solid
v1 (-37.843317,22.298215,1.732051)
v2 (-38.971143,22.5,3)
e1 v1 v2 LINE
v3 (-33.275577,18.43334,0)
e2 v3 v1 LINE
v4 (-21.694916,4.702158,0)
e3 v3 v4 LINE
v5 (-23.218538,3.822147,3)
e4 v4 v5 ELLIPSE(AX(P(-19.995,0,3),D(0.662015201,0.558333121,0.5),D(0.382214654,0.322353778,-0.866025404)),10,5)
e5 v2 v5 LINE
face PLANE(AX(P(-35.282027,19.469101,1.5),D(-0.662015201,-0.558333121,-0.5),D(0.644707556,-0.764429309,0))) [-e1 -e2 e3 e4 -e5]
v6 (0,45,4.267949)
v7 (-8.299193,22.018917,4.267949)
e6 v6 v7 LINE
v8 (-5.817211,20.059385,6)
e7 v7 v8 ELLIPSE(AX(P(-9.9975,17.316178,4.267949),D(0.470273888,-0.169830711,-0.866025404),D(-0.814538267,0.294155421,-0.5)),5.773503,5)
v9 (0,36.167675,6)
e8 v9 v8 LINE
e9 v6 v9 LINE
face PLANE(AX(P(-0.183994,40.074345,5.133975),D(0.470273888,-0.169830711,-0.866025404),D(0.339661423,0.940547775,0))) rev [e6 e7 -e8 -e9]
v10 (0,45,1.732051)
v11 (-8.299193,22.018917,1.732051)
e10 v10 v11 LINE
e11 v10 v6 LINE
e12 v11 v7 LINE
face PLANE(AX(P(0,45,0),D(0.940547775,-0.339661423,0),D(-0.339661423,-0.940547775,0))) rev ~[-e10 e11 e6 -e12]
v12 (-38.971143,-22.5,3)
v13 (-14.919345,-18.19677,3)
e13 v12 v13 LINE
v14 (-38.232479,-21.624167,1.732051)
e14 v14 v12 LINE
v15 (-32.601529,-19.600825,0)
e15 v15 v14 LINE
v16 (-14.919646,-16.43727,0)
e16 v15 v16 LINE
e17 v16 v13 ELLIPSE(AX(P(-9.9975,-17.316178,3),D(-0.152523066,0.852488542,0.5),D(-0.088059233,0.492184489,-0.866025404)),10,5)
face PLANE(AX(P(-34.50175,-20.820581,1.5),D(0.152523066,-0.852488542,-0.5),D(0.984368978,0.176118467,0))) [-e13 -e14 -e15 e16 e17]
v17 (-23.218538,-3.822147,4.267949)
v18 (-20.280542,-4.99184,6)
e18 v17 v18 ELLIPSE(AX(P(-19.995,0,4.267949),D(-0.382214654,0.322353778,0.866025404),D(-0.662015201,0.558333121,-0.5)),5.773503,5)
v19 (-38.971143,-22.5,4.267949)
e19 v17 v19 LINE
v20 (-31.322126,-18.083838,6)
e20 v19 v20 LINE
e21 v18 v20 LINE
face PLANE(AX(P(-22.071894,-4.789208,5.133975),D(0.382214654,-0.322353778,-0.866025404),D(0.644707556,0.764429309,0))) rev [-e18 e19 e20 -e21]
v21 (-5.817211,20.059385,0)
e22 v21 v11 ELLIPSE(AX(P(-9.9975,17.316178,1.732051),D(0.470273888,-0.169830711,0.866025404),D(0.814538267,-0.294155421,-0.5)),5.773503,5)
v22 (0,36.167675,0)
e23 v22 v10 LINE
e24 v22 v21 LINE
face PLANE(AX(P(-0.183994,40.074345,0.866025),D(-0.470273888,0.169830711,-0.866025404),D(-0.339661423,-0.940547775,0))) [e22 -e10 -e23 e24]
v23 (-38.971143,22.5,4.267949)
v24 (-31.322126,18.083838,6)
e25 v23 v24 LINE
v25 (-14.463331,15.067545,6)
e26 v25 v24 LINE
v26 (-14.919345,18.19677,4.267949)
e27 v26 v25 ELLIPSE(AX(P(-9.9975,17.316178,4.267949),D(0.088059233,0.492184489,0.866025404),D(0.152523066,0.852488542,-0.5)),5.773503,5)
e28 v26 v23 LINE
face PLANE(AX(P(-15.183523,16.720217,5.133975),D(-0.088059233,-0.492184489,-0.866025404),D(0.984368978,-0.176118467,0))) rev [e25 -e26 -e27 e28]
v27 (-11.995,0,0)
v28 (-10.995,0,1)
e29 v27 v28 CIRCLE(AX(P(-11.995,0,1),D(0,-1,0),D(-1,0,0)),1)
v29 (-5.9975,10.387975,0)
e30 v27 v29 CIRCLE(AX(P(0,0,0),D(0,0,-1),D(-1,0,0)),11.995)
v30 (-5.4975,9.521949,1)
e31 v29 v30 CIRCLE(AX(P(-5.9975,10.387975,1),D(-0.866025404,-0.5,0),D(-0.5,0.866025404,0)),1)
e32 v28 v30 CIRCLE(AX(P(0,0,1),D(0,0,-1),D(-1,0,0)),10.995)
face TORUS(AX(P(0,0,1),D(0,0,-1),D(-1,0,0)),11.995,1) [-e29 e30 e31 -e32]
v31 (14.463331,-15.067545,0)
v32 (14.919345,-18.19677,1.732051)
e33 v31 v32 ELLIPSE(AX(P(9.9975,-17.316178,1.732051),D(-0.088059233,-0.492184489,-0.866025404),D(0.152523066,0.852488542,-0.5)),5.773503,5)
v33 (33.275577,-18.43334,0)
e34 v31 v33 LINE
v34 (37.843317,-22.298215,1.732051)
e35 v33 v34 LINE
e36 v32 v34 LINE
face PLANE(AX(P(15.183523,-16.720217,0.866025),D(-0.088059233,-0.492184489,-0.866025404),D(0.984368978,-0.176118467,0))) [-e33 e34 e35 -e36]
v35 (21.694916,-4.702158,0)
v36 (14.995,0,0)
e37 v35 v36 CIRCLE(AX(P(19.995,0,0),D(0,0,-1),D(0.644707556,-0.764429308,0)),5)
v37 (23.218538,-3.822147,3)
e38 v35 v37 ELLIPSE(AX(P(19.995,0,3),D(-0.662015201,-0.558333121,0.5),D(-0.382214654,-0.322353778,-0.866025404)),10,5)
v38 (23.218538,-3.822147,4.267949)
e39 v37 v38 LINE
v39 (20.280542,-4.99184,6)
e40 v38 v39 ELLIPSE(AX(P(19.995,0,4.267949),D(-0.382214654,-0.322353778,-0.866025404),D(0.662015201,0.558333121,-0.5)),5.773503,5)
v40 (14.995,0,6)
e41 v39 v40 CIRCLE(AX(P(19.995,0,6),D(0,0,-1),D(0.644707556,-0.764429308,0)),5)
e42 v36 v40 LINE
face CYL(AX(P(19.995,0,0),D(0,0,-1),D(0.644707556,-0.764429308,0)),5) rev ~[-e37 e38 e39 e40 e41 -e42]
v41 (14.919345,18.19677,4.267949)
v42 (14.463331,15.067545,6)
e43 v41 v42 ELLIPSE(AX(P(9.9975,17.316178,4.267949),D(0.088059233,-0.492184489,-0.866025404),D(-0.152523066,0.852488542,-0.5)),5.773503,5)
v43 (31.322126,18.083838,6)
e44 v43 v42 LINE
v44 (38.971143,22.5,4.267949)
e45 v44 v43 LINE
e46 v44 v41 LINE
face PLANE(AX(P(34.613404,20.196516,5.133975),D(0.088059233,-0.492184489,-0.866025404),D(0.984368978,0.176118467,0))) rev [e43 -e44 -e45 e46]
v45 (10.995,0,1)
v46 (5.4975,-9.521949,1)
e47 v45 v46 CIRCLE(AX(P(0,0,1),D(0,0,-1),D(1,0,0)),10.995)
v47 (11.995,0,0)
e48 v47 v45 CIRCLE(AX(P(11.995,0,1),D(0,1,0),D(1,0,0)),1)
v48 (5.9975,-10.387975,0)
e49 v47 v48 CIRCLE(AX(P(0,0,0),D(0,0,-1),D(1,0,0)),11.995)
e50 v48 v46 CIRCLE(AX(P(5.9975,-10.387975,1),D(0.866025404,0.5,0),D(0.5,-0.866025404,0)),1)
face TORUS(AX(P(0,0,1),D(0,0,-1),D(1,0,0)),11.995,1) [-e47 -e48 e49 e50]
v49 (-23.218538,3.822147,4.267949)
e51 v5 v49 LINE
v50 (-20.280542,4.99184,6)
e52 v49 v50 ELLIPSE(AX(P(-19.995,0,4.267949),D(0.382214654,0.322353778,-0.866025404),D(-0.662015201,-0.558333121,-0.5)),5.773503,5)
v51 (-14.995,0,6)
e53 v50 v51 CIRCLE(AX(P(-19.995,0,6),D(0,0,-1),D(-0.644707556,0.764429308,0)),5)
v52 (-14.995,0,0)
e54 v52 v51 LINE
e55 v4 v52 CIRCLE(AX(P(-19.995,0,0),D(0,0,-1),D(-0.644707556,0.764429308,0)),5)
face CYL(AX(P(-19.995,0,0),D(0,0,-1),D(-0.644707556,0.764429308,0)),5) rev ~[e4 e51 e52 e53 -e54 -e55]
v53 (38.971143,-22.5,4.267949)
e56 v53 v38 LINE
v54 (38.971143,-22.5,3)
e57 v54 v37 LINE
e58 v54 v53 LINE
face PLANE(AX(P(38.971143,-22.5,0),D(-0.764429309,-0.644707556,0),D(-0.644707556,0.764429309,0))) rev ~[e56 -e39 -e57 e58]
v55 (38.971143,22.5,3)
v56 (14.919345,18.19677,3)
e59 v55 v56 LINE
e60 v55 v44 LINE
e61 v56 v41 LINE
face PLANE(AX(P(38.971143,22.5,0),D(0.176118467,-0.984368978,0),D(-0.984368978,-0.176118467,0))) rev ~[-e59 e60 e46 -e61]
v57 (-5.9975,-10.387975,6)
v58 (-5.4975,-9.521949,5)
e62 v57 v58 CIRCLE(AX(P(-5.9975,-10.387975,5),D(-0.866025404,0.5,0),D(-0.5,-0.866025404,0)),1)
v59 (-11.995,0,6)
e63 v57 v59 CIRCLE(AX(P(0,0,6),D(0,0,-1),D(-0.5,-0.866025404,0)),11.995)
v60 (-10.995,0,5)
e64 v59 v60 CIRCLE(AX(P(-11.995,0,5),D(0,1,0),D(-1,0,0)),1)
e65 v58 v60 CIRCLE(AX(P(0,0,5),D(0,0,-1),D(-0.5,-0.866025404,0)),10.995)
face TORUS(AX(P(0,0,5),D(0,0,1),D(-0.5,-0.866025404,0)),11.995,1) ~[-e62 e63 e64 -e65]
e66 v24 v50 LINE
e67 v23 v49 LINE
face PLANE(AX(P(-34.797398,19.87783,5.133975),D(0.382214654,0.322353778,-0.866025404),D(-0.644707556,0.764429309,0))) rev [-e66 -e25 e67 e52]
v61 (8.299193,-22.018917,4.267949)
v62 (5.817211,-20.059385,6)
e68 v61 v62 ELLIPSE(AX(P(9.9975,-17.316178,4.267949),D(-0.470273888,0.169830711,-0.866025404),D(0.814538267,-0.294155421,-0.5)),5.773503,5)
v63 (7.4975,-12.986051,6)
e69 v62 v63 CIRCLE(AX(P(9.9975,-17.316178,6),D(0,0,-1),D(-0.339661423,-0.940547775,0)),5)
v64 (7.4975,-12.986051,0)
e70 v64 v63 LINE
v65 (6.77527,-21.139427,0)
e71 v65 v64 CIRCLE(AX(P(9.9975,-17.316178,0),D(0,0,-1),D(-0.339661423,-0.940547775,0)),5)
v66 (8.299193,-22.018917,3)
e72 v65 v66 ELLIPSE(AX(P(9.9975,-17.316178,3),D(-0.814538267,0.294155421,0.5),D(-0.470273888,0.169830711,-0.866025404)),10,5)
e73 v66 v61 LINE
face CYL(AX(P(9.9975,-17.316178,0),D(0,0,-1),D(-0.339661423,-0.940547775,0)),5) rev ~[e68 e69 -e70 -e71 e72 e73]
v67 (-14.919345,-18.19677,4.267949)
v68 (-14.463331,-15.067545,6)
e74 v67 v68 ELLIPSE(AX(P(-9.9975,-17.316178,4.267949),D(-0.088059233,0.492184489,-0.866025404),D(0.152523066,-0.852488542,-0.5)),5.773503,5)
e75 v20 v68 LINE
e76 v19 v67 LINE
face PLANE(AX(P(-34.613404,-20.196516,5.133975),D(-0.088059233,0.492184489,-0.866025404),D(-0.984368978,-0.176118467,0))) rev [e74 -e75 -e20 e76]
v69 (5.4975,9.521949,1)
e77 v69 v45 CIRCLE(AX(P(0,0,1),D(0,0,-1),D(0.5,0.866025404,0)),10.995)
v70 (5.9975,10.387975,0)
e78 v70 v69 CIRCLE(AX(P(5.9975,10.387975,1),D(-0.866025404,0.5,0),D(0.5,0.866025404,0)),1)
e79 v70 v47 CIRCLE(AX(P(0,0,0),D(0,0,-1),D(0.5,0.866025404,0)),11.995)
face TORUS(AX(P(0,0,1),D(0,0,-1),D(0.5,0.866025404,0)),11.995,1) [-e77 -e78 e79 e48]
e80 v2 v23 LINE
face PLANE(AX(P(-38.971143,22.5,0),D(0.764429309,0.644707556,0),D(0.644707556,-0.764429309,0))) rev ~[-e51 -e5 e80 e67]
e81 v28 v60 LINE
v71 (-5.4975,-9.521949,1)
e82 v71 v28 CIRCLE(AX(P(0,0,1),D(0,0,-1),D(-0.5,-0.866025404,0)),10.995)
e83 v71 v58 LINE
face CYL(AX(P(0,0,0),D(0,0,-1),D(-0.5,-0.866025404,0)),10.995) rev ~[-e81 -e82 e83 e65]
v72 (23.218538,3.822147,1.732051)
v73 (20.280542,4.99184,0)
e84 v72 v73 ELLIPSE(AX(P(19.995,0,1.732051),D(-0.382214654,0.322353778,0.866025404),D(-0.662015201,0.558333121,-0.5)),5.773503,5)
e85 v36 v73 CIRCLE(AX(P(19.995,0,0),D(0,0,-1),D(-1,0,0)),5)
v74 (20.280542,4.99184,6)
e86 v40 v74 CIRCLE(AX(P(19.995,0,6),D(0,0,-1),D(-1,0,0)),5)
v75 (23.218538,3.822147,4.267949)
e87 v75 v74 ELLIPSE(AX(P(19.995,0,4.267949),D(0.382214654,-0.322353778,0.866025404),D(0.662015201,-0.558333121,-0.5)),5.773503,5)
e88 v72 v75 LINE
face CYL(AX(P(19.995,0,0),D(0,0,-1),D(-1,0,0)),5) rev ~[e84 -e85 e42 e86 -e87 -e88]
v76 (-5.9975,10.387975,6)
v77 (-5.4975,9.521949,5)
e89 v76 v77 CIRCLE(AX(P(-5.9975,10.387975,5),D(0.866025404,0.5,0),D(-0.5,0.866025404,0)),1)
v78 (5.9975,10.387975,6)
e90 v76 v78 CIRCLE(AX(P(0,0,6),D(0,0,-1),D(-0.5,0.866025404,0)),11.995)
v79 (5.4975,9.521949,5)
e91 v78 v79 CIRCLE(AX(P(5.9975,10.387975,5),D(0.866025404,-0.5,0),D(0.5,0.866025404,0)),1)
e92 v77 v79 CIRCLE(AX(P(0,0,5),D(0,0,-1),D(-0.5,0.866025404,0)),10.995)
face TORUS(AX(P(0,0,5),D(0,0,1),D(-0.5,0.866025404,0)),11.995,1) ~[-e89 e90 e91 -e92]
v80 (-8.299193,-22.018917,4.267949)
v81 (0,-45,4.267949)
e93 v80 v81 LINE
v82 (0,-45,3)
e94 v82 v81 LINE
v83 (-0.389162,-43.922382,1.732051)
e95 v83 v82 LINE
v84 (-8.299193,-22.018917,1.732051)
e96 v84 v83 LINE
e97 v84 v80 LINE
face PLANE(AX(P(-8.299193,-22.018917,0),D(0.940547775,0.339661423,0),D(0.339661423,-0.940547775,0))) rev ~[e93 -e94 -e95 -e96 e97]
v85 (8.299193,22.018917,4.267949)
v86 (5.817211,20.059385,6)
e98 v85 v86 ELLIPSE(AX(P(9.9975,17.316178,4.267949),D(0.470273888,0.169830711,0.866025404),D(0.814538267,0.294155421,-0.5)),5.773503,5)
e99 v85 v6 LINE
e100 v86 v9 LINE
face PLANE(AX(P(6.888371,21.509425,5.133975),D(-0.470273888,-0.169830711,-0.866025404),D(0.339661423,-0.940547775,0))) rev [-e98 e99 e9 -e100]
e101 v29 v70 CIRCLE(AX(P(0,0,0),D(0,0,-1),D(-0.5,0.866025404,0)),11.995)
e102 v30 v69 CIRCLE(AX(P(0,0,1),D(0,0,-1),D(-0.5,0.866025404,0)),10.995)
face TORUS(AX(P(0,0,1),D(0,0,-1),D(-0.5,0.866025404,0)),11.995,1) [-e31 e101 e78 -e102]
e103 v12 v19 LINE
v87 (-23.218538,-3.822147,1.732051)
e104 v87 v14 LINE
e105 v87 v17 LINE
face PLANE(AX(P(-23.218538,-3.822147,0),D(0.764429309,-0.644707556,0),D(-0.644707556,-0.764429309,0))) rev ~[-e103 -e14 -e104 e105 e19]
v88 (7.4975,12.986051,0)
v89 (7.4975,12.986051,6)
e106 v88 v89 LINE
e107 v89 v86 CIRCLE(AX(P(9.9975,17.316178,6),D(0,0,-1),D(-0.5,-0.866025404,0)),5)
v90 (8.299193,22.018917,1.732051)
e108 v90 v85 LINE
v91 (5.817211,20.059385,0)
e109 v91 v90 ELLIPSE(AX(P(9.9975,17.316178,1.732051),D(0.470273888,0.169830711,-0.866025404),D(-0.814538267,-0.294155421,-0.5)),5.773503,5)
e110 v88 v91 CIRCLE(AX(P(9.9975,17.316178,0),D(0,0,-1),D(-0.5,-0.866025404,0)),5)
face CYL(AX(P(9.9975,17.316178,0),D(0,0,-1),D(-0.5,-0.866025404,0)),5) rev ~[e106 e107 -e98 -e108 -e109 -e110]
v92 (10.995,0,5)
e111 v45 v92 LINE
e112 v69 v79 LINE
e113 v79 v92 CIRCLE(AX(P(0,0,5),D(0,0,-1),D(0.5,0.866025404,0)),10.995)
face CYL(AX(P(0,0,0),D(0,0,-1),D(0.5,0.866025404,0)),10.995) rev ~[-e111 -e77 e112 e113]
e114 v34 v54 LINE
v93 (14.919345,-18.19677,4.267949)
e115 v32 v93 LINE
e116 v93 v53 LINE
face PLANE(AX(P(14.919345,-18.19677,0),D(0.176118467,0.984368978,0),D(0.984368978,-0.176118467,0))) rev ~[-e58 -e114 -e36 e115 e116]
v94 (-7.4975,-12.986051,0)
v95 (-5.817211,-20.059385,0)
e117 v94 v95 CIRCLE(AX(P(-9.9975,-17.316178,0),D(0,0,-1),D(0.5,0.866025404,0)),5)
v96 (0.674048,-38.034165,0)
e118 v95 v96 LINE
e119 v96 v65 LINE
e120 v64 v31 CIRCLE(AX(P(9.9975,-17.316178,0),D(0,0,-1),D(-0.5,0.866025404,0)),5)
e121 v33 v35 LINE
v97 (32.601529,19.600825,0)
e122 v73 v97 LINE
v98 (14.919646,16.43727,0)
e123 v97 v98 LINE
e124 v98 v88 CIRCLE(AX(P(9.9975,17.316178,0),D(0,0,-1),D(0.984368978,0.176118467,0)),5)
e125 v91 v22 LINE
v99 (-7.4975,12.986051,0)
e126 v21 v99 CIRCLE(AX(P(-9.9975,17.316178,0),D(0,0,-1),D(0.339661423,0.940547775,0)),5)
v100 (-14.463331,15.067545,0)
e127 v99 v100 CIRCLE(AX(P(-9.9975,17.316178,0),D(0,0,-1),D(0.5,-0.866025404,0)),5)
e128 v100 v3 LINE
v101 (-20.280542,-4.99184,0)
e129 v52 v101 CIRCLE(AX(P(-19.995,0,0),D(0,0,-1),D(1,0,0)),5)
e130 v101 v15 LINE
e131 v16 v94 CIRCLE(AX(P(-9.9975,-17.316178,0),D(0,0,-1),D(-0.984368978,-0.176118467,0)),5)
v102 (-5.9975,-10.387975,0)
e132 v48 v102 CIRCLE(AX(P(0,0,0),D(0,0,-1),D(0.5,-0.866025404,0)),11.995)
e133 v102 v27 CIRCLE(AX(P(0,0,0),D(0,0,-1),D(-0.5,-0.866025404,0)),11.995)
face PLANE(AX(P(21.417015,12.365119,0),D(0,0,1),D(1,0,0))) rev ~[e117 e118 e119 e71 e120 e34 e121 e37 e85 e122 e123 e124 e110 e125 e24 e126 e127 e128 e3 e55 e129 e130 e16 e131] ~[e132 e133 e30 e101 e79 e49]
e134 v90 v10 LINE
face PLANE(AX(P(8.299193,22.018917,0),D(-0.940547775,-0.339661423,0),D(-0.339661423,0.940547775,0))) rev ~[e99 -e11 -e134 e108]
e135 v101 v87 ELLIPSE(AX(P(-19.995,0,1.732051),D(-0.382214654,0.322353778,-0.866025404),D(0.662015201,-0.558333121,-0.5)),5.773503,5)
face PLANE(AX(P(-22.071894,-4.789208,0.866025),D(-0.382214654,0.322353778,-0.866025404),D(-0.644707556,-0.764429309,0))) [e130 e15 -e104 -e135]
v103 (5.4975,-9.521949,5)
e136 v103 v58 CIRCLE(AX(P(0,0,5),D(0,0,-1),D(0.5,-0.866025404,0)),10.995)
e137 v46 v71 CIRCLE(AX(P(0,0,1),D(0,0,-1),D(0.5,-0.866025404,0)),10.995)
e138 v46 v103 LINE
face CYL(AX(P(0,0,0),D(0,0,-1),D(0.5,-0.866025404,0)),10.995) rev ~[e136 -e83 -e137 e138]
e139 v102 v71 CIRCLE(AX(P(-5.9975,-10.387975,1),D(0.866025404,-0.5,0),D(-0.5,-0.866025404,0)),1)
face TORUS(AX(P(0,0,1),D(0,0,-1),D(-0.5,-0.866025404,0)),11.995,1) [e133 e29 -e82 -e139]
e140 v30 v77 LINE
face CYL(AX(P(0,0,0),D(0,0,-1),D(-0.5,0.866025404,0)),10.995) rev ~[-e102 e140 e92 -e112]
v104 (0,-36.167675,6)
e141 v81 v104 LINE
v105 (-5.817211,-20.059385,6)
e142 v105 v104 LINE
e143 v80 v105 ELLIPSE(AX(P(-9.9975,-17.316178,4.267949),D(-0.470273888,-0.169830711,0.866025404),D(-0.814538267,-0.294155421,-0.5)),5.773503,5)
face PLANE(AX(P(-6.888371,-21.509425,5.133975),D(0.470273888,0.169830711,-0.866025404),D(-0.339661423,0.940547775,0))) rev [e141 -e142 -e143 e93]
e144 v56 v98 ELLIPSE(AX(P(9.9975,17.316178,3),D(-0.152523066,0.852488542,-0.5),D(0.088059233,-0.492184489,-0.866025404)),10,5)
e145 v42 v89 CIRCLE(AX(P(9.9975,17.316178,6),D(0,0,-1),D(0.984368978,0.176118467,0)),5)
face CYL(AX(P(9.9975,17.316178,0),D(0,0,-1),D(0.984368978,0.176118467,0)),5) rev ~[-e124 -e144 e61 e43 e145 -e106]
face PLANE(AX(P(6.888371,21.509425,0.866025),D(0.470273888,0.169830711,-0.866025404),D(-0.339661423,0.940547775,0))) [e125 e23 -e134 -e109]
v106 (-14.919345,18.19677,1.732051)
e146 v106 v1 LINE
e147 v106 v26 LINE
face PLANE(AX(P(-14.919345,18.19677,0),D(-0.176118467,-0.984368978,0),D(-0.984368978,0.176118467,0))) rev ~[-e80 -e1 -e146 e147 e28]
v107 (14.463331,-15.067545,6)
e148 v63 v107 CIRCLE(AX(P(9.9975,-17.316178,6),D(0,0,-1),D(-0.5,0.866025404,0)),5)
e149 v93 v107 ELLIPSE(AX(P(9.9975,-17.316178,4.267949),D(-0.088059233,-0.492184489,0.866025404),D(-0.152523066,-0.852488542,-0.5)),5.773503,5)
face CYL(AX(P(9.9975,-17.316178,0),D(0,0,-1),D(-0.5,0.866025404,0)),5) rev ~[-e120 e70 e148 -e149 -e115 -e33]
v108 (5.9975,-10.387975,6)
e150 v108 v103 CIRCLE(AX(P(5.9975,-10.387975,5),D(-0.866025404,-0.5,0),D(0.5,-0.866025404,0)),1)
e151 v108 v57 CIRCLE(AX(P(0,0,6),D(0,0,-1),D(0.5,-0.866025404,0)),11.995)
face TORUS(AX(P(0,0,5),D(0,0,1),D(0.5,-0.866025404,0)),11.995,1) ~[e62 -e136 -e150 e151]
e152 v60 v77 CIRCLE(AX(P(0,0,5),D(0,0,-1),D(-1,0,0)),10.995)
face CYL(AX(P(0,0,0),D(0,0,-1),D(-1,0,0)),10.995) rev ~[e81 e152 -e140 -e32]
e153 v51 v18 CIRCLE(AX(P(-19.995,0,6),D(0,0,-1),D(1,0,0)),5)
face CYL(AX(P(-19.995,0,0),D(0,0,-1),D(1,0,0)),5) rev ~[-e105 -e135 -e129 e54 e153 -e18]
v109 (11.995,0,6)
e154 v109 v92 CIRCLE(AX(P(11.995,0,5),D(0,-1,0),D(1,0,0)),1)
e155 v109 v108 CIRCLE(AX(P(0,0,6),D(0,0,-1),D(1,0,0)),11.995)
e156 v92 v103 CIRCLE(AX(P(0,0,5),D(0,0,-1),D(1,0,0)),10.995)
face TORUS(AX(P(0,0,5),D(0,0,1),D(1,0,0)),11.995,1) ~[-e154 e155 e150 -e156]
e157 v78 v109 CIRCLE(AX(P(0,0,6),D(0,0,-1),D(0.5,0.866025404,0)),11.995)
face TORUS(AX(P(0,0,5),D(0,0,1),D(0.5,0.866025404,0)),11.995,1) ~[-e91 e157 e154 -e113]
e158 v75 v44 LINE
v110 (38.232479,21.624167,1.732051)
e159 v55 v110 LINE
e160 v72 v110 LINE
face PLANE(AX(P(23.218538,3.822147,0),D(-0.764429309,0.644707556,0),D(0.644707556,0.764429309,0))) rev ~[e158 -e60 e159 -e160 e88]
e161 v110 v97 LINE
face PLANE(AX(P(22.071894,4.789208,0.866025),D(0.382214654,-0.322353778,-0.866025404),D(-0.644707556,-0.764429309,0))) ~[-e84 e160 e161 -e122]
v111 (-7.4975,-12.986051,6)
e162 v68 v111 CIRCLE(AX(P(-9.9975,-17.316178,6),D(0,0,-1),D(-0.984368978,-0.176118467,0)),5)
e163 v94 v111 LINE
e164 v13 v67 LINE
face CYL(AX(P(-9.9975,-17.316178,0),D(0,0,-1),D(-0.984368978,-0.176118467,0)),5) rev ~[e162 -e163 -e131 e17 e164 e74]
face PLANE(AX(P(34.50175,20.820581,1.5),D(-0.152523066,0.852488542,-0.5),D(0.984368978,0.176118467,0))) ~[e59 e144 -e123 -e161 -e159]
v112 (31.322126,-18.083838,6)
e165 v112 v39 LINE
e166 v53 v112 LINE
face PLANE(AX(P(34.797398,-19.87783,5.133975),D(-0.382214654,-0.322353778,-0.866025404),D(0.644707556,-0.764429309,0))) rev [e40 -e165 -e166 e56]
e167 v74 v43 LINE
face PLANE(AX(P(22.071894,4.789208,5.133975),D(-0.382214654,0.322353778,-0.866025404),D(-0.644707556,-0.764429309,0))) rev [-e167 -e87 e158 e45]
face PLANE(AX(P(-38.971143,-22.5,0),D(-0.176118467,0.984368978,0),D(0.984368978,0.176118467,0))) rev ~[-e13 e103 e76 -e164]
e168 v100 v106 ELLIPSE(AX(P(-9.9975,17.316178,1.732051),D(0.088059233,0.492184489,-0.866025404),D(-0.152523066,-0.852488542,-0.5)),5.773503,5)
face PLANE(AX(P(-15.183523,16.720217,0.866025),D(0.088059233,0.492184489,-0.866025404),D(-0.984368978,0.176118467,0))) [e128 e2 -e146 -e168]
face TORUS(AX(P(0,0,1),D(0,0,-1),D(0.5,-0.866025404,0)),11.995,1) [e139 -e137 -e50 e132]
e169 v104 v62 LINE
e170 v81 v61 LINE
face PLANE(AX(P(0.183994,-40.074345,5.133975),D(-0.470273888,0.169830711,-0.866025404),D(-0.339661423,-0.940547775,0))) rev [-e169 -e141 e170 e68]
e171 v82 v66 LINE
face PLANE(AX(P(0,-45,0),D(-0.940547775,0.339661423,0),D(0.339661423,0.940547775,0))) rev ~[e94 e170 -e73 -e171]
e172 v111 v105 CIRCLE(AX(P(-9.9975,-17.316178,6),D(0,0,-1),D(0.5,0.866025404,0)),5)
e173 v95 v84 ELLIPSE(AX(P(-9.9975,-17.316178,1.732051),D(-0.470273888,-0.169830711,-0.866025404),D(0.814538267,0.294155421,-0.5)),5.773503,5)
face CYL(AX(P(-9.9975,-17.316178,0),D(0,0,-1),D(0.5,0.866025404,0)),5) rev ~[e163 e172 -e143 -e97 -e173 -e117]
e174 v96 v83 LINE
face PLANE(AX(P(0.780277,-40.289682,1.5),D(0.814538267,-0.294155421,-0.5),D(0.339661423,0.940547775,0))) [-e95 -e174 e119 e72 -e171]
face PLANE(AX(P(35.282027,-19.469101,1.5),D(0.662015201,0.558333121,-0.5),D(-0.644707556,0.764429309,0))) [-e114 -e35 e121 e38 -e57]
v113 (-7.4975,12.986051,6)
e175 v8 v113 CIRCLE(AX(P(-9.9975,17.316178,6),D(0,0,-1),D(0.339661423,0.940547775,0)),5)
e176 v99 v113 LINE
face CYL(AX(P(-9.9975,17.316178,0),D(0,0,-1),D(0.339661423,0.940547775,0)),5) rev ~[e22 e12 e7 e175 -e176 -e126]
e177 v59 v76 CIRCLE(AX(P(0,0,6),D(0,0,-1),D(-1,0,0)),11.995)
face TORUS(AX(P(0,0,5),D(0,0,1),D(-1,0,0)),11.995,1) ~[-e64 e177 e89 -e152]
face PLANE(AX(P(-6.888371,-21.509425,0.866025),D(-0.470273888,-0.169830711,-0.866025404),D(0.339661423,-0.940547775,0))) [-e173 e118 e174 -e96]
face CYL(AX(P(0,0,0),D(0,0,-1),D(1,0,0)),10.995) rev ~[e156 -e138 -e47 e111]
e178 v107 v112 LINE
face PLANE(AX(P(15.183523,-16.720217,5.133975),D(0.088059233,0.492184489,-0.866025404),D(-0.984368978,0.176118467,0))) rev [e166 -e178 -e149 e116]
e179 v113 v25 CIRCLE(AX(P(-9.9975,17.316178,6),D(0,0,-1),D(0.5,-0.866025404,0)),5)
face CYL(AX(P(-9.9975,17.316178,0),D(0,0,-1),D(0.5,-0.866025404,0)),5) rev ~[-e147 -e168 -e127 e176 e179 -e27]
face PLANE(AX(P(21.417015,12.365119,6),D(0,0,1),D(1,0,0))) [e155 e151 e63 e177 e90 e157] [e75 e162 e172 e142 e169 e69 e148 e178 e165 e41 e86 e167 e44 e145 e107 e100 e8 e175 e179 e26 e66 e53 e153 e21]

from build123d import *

# Parameters (mm, degrees)
F1_DEPTH     = 6
F2_C1_SIZE2  = 3
F2_C1_SIZE   = 1.7320508076
F2_C2_SIZE2  = 3
F2_C2_SIZE   = 1.7320508076
F2_C3_SIZE2  = 1.7320508076
F2_C3_SIZE   = 3
F2_C4_SIZE2  = 3
F2_C4_SIZE   = 1.7320508076
F2_C5_SIZE2  = 1.7320508076
F2_C5_SIZE   = 3
F2_C6_SIZE2  = 3
F2_C6_SIZE   = 1.7320508076
F2_C7_SIZE2  = 1.7320508076
F2_C7_SIZE   = 3
F2_C8_SIZE2  = 3
F2_C8_SIZE   = 1.7320508076
F2_C9_SIZE2  = 1.7320508076
F2_C9_SIZE   = 3
F2_C10_SIZE2 = 3
F2_C10_SIZE  = 1.7320508076
F2_C11_SIZE2 = 3
F2_C11_SIZE  = 1.7320508076
F2_C12_SIZE2 = 3
F2_C12_SIZE  = 1.7320508076
F2_C13_SIZE2 = 1.7320508076
F2_C13_SIZE  = 3
F2_C14_SIZE2 = 3
F2_C14_SIZE  = 1.7320508076
F2_C15_SIZE2 = 3
F2_C15_SIZE  = 1.7320508076
F2_C16_SIZE2 = 3
F2_C16_SIZE  = 1.7320508076
F2_C17_SIZE2 = 1.7320508076
F2_C17_SIZE  = 3
F2_C18_SIZE2 = 3
F2_C18_SIZE  = 1.7320508076
F2_C19_SIZE2 = 3
F2_C19_SIZE  = 1.7320508076
F2_C20_SIZE2 = 3
F2_C20_SIZE  = 1.7320508076
F2_C21_SIZE2 = 1.7320508076
F2_C21_SIZE  = 3
F2_C22_SIZE2 = 3
F2_C22_SIZE  = 1.7320508076
F2_C23_SIZE2 = 3
F2_C23_SIZE  = 1.7320508076
F2_C24_SIZE2 = 3
F2_C24_SIZE  = 1.7320508076
F3_R         = 1


with BuildPart() as f1:
    # F0 (on Top) → F1 (new body)
    with BuildSketch(Plane.XY):
        with BuildLine():
            ThreePointArc((5.4975, 9.5219493146), (9.5219493146, 5.4975), (10.995, 0))
            Line((10.995, 0), (14.995, 0))
            ThreePointArc((14.995, 0), (17.8875950663, 4.5341861944), (23.2185377782, 3.8221465425))
            Line((23.2185377782, 3.8221465425), (38.9711431703, 22.5))
            Line((38.9711431703, 22.5), (14.9193448919, 18.1967702834))
            ThreePointArc((14.9193448919, 18.1967702834), (12.870517963, 13.2240186428), (7.4975, 12.9860509297))
            Line((7.4975, 12.9860509297), (5.4975, 9.5219493146))
        make_face()
        with BuildLine():
            ThreePointArc((-5.4975, 9.5219493146), (0, 10.995), (5.4975, 9.5219493146))
            Line((5.4975, 9.5219493146), (7.4975, 12.9860509297))
            ThreePointArc((7.4975, 12.9860509297), (5.0170771033, 17.7582048372), (8.2991928863, 22.0189168259))
            Line((8.2991928863, 22.0189168259), (0, 45))
            Line((0, 45), (-8.2991928863, 22.0189168259))
            ThreePointArc((-8.2991928863, 22.0189168259), (-5.0170771033, 17.7582048372), (-7.4975, 12.9860509297))
            Line((-7.4975, 12.9860509297), (-5.4975, 9.5219493146))
        make_face()
        with BuildLine():
            ThreePointArc((-10.995, 0), (-9.5219493146, 5.4975), (-5.4975, 9.5219493146))
            Line((-5.4975, 9.5219493146), (-7.4975, 12.9860509297))
            ThreePointArc((-7.4975, 12.9860509297), (-12.870517963, 13.2240186428), (-14.9193448919, 18.1967702834))
            Line((-14.9193448919, 18.1967702834), (-38.9711431703, 22.5))
            Line((-38.9711431703, 22.5), (-23.2185377782, 3.8221465425))
            ThreePointArc((-23.2185377782, 3.8221465425), (-17.8875950663, 4.5341861944), (-14.995, 0))
            Line((-14.995, 0), (-10.995, 0))
        make_face()
        with BuildLine():
            Line((-7.4975, -12.9860509297), (-5.4975, -9.5219493146))
            ThreePointArc((-5.4975, -9.5219493146), (-9.5219493146, -5.4975), (-10.995, 0))
            Line((-10.995, 0), (-14.995, 0))
            ThreePointArc((-14.995, 0), (-17.8875950663, -4.5341861944), (-23.2185377782, -3.8221465425))
            Line((-23.2185377782, -3.8221465425), (-38.9711431703, -22.5))
            Line((-38.9711431703, -22.5), (-14.9193448919, -18.1967702834))
            ThreePointArc((-14.9193448919, -18.1967702834), (-12.870517963, -13.2240186428), (-7.4975, -12.9860509297))
        make_face()
        with BuildLine():
            Line((7.4975, -12.9860509297), (5.4975, -9.5219493146))
            ThreePointArc((5.4975, -9.5219493146), (0, -10.995), (-5.4975, -9.5219493146))
            Line((-5.4975, -9.5219493146), (-7.4975, -12.9860509297))
            ThreePointArc((-7.4975, -12.9860509297), (-5.0170771033, -17.7582048372), (-8.2991928863, -22.0189168259))
            Line((-8.2991928863, -22.0189168259), (0, -45))
            Line((0, -45), (8.2991928863, -22.0189168259))
            ThreePointArc((8.2991928863, -22.0189168259), (5.0170771033, -17.7582048372), (7.4975, -12.9860509297))
        make_face()
        with BuildLine():
            Line((14.995, 0), (10.995, 0))
            ThreePointArc((10.995, 0), (9.5219493146, -5.4975), (5.4975, -9.5219493146))
            Line((5.4975, -9.5219493146), (7.4975, -12.9860509297))
            ThreePointArc((7.4975, -12.9860509297), (12.870517963, -13.2240186428), (14.9193448919, -18.1967702834))
            Line((14.9193448919, -18.1967702834), (38.9711431703, -22.5))
            Line((38.9711431703, -22.5), (23.2185377782, -3.8221465425))
            ThreePointArc((23.2185377782, -3.8221465425), (17.8875950663, -4.5341861944), (14.995, 0))
        make_face()
    extrude(amount=F1_DEPTH)

    # F2: chamfer of 3 x 1.7320508076 on 24 edges, made by hand

    # F2_c1
    f2_c1_edges = [f1.edges().sort_by_distance(p)[0] for p in [
        (31.0948404742, 13.1610732713, 0),
    ]]
    f2_c1_side = f1.faces().sort_by_distance((31.0948404742, 13.1610732713, 0.0346410162))[0]
    chamfer(f2_c1_edges, length=F2_C1_SIZE, length2=F2_C1_SIZE2, reference=f2_c1_side)

    # F2_c2
    f2_c2_edges = [f1.edges().sort_by_distance(p)[0] for p in [
        (31.0948404742, 13.1610732713, 6),
    ]]
    f2_c2_side = f1.faces().sort_by_distance((31.0948404742, 13.1610732713, 5.9653589838))[0]
    chamfer(f2_c2_edges, length=F2_C2_SIZE, length2=F2_C2_SIZE2, reference=f2_c2_side)

    # F2_c3
    f2_c3_edges = [f1.edges().sort_by_distance(p)[0] for p in [
        (24.6342857936, 19.9349198346, 0),
    ]]
    f2_c3_side = f1.faces().sort_by_distance((24.6342857936, 19.9349198346, 0.0346410162))[0]
    chamfer(f2_c3_edges, length=F2_C3_SIZE, length2=F2_C3_SIZE2, reference=f2_c3_side)

    # F2_c4
    f2_c4_edges = [f1.edges().sort_by_distance(p)[0] for p in [
        (24.6342857936, 19.9349198346, 6),
    ]]
    f2_c4_side = f1.faces().sort_by_distance((24.6342857936, 19.9349198346, 5.9653589838))[0]
    chamfer(f2_c4_edges, length=F2_C4_SIZE, length2=F2_C4_SIZE2, reference=f2_c4_side)

    # F2_c5
    f2_c5_edges = [f1.edges().sort_by_distance(p)[0] for p in [
        (4.1495964431, 33.509458413, 0),
    ]]
    f2_c5_side = f1.faces().sort_by_distance((4.1170149125, 33.4976921961, 0))[0]
    chamfer(f2_c5_edges, length=F2_C5_SIZE, length2=F2_C5_SIZE2, reference=f2_c5_side)

    # F2_c6
    f2_c6_edges = [f1.edges().sort_by_distance(p)[0] for p in [
        (4.1495964431, 33.509458413, 6),
    ]]
    f2_c6_side = f1.faces().sort_by_distance((4.1495964431, 33.509458413, 5.9653589838))[0]
    chamfer(f2_c6_edges, length=F2_C6_SIZE, length2=F2_C6_SIZE2, reference=f2_c6_side)

    # F2_c7
    f2_c7_edges = [f1.edges().sort_by_distance(p)[0] for p in [
        (-4.9470041023, 31.3013772186, 0),
    ]]
    f2_c7_side = f1.faces().sort_by_distance((-4.9144225717, 31.2896110018, 0))[0]
    chamfer(f2_c7_edges, length=F2_C7_SIZE, length2=F2_C7_SIZE2, reference=f2_c7_side)

    # F2_c8
    f2_c8_edges = [f1.edges().sort_by_distance(p)[0] for p in [
        (-4.9470041023, 31.3013772186, 6),
    ]]
    f2_c8_side = f1.faces().sort_by_distance((-4.9470041023, 31.3013772186, 5.9653589838))[0]
    chamfer(f2_c8_edges, length=F2_C8_SIZE, length2=F2_C8_SIZE2, reference=f2_c8_side)

    # F2_c9
    f2_c9_edges = [f1.edges().sort_by_distance(p)[0] for p in [
        (-26.9452440311, 20.3483851417, 0),
    ]]
    f2_c9_side = f1.faces().sort_by_distance((-26.9513449538, 20.3142856, 0))[0]
    chamfer(f2_c9_edges, length=F2_C9_SIZE, length2=F2_C9_SIZE2, reference=f2_c9_side)

    # F2_c10
    f2_c10_edges = [f1.edges().sort_by_distance(p)[0] for p in [
        (-26.9452440311, 20.3483851417, 6),
    ]]
    f2_c10_side = f1.faces().sort_by_distance((-26.9452440311, 20.3483851417, 5.9653589838))[0]
    chamfer(f2_c10_edges, length=F2_C10_SIZE, length2=F2_C10_SIZE2, reference=f2_c10_side)

    # F2_c11
    f2_c11_edges = [f1.edges().sort_by_distance(p)[0] for p in [
        (-29.581289896, 11.3664573841, 0),
    ]]
    f2_c11_side = f1.faces().sort_by_distance((-29.5548092879, 11.3887907089, 0))[0]
    chamfer(f2_c11_edges, length=F2_C11_SIZE, length2=F2_C11_SIZE2, reference=f2_c11_side)

    # F2_c12
    f2_c12_edges = [f1.edges().sort_by_distance(p)[0] for p in [
        (-29.581289896, 11.3664573841, 6),
    ]]
    f2_c12_side = f1.faces().sort_by_distance((-29.581289896, 11.3664573841, 5.9653589838))[0]
    chamfer(f2_c12_edges, length=F2_C12_SIZE, length2=F2_C12_SIZE2, reference=f2_c12_side)

    # F2_c13
    f2_c13_edges = [f1.edges().sort_by_distance(p)[0] for p in [
        (-31.0948404742, -13.1610732713, 0),
    ]]
    f2_c13_side = f1.faces().sort_by_distance((-31.0683598662, -13.1834065961, 0))[0]
    chamfer(f2_c13_edges, length=F2_C13_SIZE, length2=F2_C13_SIZE2, reference=f2_c13_side)

    # F2_c14
    f2_c14_edges = [f1.edges().sort_by_distance(p)[0] for p in [
        (-31.0948404742, -13.1610732713, 6),
    ]]
    f2_c14_side = f1.faces().sort_by_distance((-31.0948404742, -13.1610732713, 5.9653589838))[0]
    chamfer(f2_c14_edges, length=F2_C14_SIZE, length2=F2_C14_SIZE2, reference=f2_c14_side)

    # F2_c15
    f2_c15_edges = [f1.edges().sort_by_distance(p)[0] for p in [
        (-24.6342857936, -19.9349198346, 0),
    ]]
    f2_c15_side = f1.faces().sort_by_distance((-24.6403867163, -19.9008202929, 0))[0]
    chamfer(f2_c15_edges, length=F2_C15_SIZE, length2=F2_C15_SIZE2, reference=f2_c15_side)

    # F2_c16
    f2_c16_edges = [f1.edges().sort_by_distance(p)[0] for p in [
        (-24.6342857936, -19.9349198346, 6),
    ]]
    f2_c16_side = f1.faces().sort_by_distance((-24.6342857936, -19.9349198346, 5.9653589838))[0]
    chamfer(f2_c16_edges, length=F2_C16_SIZE, length2=F2_C16_SIZE2, reference=f2_c16_side)

    # F2_c17
    f2_c17_edges = [f1.edges().sort_by_distance(p)[0] for p in [
        (-4.1495964431, -33.509458413, 0),
    ]]
    f2_c17_side = f1.faces().sort_by_distance((-4.1170149125, -33.4976921961, 0))[0]
    chamfer(f2_c17_edges, length=F2_C17_SIZE, length2=F2_C17_SIZE2, reference=f2_c17_side)

    # F2_c18
    f2_c18_edges = [f1.edges().sort_by_distance(p)[0] for p in [
        (-4.1495964431, -33.509458413, 6),
    ]]
    f2_c18_side = f1.faces().sort_by_distance((-4.1495964431, -33.509458413, 5.9653589838))[0]
    chamfer(f2_c18_edges, length=F2_C18_SIZE, length2=F2_C18_SIZE2, reference=f2_c18_side)

    # F2_c19
    f2_c19_edges = [f1.edges().sort_by_distance(p)[0] for p in [
        (4.9470041023, -31.3013772186, 0),
    ]]
    f2_c19_side = f1.faces().sort_by_distance((4.9144225717, -31.2896110018, 0))[0]
    chamfer(f2_c19_edges, length=F2_C19_SIZE, length2=F2_C19_SIZE2, reference=f2_c19_side)

    # F2_c20
    f2_c20_edges = [f1.edges().sort_by_distance(p)[0] for p in [
        (4.9470041023, -31.3013772186, 6),
    ]]
    f2_c20_side = f1.faces().sort_by_distance((4.9470041023, -31.3013772186, 5.9653589838))[0]
    chamfer(f2_c20_edges, length=F2_C20_SIZE, length2=F2_C20_SIZE2, reference=f2_c20_side)

    # F2_c21
    f2_c21_edges = [f1.edges().sort_by_distance(p)[0] for p in [
        (26.9452440311, -20.3483851417, 0),
    ]]
    f2_c21_side = f1.faces().sort_by_distance((26.9513449538, -20.3142856, 0))[0]
    chamfer(f2_c21_edges, length=F2_C21_SIZE, length2=F2_C21_SIZE2, reference=f2_c21_side)

    # F2_c22
    f2_c22_edges = [f1.edges().sort_by_distance(p)[0] for p in [
        (26.9452440311, -20.3483851417, 6),
    ]]
    f2_c22_side = f1.faces().sort_by_distance((26.9452440311, -20.3483851417, 5.9653589838))[0]
    chamfer(f2_c22_edges, length=F2_C22_SIZE, length2=F2_C22_SIZE2, reference=f2_c22_side)

    # F2_c23
    f2_c23_edges = [f1.edges().sort_by_distance(p)[0] for p in [
        (29.581289896, -11.3664573841, 0),
    ]]
    f2_c23_side = f1.faces().sort_by_distance((29.5548092879, -11.3887907089, 0))[0]
    chamfer(f2_c23_edges, length=F2_C23_SIZE, length2=F2_C23_SIZE2, reference=f2_c23_side)

    # F2_c24
    f2_c24_edges = [f1.edges().sort_by_distance(p)[0] for p in [
        (29.581289896, -11.3664573841, 6),
    ]]
    f2_c24_side = f1.faces().sort_by_distance((29.581289896, -11.3664573841, 5.9653589838))[0]
    chamfer(f2_c24_edges, length=F2_C24_SIZE, length2=F2_C24_SIZE2, reference=f2_c24_side)

    # F3
    f3_edges = [f1.edges().sort_by_distance(p)[0] for p in [
        (-10.995, 0, 0),
        (-10.995, 0, 6),
    ]]
    fillet(f3_edges, radius=F3_R)


solid = f1.part
